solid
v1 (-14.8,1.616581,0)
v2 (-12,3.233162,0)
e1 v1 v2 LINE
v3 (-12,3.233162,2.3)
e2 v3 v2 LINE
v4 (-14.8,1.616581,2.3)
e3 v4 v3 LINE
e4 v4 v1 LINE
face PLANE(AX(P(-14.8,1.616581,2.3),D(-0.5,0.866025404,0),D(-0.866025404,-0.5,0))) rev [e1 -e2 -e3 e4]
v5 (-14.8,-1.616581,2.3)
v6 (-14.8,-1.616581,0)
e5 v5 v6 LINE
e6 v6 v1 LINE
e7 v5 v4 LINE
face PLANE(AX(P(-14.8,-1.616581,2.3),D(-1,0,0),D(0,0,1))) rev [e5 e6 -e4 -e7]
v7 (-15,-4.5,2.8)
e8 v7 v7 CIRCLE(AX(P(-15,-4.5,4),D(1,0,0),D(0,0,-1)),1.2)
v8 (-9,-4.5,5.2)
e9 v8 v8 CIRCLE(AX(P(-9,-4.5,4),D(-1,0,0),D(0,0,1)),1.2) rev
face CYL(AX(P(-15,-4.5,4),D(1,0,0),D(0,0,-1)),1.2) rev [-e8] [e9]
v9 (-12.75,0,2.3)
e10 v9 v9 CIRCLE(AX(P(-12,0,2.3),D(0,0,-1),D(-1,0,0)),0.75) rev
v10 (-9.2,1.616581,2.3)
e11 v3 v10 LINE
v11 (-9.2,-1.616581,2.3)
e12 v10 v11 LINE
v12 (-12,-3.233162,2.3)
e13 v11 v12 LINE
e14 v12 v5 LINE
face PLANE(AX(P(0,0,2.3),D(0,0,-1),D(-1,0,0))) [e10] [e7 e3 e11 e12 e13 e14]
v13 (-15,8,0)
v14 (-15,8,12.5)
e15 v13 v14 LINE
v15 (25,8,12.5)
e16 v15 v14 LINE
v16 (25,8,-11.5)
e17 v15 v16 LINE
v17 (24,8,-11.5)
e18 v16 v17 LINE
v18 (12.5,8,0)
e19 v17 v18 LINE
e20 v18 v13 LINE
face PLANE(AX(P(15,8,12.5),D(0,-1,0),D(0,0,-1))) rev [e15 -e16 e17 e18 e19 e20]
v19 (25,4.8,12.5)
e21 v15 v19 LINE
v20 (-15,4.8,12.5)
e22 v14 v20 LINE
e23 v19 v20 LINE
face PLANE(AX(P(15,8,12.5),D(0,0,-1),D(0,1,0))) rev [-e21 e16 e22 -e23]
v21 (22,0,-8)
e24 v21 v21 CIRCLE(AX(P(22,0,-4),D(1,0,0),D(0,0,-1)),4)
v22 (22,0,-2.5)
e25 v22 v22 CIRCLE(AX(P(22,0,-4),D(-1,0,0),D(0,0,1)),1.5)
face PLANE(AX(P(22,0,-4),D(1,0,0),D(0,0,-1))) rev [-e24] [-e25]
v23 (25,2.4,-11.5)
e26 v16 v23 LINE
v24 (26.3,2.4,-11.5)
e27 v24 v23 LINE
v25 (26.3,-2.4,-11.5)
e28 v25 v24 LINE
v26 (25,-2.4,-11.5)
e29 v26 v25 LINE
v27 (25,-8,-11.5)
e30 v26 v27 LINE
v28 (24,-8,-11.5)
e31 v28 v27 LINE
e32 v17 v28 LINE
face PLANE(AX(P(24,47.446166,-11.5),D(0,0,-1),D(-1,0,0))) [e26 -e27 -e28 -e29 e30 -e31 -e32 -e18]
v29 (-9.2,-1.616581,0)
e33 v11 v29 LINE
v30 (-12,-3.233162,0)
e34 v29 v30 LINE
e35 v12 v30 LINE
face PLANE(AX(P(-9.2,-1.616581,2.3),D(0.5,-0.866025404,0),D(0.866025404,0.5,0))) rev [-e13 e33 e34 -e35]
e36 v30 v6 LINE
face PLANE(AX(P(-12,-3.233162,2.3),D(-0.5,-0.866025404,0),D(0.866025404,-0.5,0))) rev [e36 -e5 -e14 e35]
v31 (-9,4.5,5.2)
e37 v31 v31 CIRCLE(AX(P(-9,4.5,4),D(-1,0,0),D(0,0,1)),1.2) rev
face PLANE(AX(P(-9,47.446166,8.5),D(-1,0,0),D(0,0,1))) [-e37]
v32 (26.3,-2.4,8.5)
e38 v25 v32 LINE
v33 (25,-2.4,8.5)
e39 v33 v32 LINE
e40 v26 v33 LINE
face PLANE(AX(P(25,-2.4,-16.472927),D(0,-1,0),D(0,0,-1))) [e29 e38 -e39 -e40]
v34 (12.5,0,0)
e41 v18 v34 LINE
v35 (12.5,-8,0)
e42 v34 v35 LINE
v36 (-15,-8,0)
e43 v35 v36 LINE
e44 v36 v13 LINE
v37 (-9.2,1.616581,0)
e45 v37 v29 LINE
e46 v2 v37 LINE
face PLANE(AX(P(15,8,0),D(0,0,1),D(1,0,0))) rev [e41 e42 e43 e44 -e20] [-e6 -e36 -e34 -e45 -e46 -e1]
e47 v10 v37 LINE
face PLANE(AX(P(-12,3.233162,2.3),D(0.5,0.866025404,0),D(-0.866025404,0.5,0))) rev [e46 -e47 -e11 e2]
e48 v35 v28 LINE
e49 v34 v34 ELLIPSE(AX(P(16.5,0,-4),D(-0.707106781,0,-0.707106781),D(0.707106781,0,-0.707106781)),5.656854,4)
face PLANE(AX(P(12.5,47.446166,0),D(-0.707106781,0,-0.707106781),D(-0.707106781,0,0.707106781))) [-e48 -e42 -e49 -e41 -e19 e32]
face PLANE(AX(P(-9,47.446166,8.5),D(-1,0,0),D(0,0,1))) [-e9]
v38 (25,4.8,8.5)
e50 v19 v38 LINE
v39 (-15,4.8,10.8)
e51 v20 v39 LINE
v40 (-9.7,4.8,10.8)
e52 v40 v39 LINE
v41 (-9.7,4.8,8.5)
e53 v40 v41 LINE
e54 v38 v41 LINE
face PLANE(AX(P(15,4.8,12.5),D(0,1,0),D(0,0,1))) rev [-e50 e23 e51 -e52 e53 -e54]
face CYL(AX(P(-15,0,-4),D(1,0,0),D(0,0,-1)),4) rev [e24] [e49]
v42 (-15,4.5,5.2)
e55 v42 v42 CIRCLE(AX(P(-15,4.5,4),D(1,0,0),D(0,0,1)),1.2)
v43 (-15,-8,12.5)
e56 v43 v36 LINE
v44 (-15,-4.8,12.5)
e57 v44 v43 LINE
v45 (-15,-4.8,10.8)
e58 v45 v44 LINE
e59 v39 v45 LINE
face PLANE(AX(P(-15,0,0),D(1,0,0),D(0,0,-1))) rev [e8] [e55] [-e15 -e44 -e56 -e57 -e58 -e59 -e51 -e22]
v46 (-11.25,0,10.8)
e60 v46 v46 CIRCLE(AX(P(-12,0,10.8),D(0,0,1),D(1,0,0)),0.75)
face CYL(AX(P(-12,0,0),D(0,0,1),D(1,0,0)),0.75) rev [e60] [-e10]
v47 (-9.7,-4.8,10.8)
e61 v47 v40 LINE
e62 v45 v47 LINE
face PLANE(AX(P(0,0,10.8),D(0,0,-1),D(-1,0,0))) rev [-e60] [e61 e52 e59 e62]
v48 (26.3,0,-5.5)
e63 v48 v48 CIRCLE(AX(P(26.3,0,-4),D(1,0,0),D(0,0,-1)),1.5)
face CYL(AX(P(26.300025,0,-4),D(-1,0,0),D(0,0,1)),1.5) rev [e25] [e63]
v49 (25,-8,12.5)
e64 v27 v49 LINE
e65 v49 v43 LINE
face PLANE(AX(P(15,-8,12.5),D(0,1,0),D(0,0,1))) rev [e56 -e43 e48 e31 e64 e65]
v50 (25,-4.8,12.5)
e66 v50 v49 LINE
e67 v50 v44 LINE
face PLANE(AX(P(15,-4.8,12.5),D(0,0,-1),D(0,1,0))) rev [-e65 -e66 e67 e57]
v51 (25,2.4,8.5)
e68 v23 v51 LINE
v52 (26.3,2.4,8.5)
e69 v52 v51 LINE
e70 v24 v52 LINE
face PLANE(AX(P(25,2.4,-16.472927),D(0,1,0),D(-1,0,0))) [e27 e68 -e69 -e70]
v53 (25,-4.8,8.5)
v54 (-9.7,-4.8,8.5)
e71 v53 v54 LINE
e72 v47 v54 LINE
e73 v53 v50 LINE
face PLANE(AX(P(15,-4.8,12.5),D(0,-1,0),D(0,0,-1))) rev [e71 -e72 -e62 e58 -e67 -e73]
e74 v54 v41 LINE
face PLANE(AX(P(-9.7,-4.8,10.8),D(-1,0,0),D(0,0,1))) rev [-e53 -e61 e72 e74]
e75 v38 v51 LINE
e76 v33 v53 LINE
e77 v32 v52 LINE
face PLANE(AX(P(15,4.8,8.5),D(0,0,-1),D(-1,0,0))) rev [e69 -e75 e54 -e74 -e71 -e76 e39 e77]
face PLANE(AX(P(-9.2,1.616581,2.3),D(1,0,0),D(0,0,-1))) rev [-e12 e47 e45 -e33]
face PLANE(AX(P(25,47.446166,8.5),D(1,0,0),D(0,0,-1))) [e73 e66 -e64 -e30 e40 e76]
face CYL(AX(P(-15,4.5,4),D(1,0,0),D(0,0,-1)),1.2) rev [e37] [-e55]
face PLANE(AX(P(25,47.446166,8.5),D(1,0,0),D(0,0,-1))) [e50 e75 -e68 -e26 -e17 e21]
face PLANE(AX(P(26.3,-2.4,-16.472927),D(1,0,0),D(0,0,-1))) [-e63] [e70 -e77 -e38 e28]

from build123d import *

# Parameters (mm, degrees)
BOSS_EXTRU_1_DEPTH                             = 15
ESQUISSE2_R                                    = 1.2
ENL_V_MAT_EXTRU_1_DEPTH                        = 26.243811123
ESQUISSE3_R                                    = 0.75
ENL_V_MAT_EXTRU_2_DEPTH                        = 20.006577809
ESQUISSE4_R                                    = 1.2
ENL_V_MAT_EXTRU_3_DEPTH                        = 34.470135942
BOSS_EXTRU_2_START                             = 2.3
ESQUISSE5_W                                    = 5.3
ESQUISSE5_H                                    = 9.6
ESQUISSE5_R                                    = 0.75
BOSS_EXTRU_2_DEPTH                             = 2.3
FRAISAGE_POUR_VIS_T_TE_FRAIS_E_M31_D           = 3.2
FRAISAGE_POUR_VIS_T_TE_FRAIS_E_M31_CSINK_D     = 6.3
FRAISAGE_POUR_VIS_T_TE_FRAIS_E_M31_CSINK_ANGLE = 90
ENL_V_MAT_EXTRU_4_DEPTH                        = 2.3
ESQUISSE9_R                                    = 1.2
ENL_V_MAT_EXTRU_5_DEPTH                        = 20.006577853
BOSS_EXTRU_3_DEPTH                             = 16
ESQUISSE11_W                                   = 4
ESQUISSE11_H                                   = 3.2
BOSS_EXTRU_4_DEPTH                             = 10
ESQUISSE14_W                                   = 1.3
ESQUISSE14_H                                   = 4.8
BOSS_EXTRU_5_DEPTH                             = 20
ENL_V_MAT_EXTRU_6_OUTLINE_W                    = 4
ENL_V_MAT_EXTRU_6_OUTLINE_H                    = 9.502069599
ESQUISSE13_R                                   = 1.5
ENL_V_MAT_EXTRU_7_DEPTH                        = 40.865398531


with BuildPart() as part:
    # Esquisse1 → Boss.-Extru.1 (new, symmetric)
    with BuildSketch(Plane(origin=(0, 0, 0), x_dir=(0, 0, -1), z_dir=(1, 0, 0))):
        Polygon((-12.5, -4.8), (-12.5, -8), (0, -8), (0, 8), (-12.5, 8), (-12.5, 4.8), (-8.5, 4.8), (-8.5, -4.8), align=None)
    extrude(amount=BOSS_EXTRU_1_DEPTH, both=True)

    # Esquisse2 → Enlèv. mat.-Extru.1 (cut, through all)
    with BuildSketch(Plane(origin=(0, 8, 0), x_dir=(1, 0, 0), z_dir=(0, 1, 0))):
        with Locations(Location((-7.5, -4, 0), (0, 0, 270))):
            Circle(ESQUISSE2_R)
        with Locations(Location((7.5, -4, 0), (0, 0, 90))):
            Circle(ESQUISSE2_R)
        with Locations(Location((0, -4, 0), (0, 0, 270))):
            Circle(ESQUISSE2_R)
    extrude(amount=-ENL_V_MAT_EXTRU_1_DEPTH, mode=Mode.SUBTRACT)

    # Esquisse3 → Enlèv. mat.-Extru.2 (cut, through all)
    with BuildSketch(Plane.XY.offset(8.5)):
        with Locations((-12, 0)):
            Circle(ESQUISSE3_R)
    extrude(amount=-ENL_V_MAT_EXTRU_2_DEPTH, mode=Mode.SUBTRACT)

    # Esquisse4 → Enlèv. mat.-Extru.3 (cut, through all)
    with BuildSketch(Plane(origin=(15, 0, 0), x_dir=(0, 0, -1), z_dir=(1, 0, 0))):
        with Locations((-4, -4.5)):
            Circle(ESQUISSE4_R)
        with Locations(Location((-4, 4.5, 0), (0, 0, 180))):
            Circle(ESQUISSE4_R)
    extrude(amount=-ENL_V_MAT_EXTRU_3_DEPTH, mode=Mode.SUBTRACT)

    # Esquisse5 → Boss.-Extru.2 (add)
    with BuildSketch(Plane.XY.offset(8.5).offset(BOSS_EXTRU_2_START)):
        with Locations((-12.35, 0)):
            Rectangle(ESQUISSE5_W, ESQUISSE5_H)
        with Locations((-12, 0)):
            Circle(ESQUISSE5_R, mode=Mode.SUBTRACT)
    extrude(amount=-BOSS_EXTRU_2_DEPTH)

    # Fraisage pour vis à tête fraisée M31 (through all)
    with Locations(Plane.XY.offset(8.5)):
        with Locations((0, 0)):
            CounterSinkHole(FRAISAGE_POUR_VIS_T_TE_FRAIS_E_M31_D / 2, FRAISAGE_POUR_VIS_T_TE_FRAIS_E_M31_CSINK_D / 2, counter_sink_angle=FRAISAGE_POUR_VIS_T_TE_FRAIS_E_M31_CSINK_ANGLE)

    # Esquisse8 → Enlèv. mat.-Extru.4 (cut)
    with BuildSketch(Plane(origin=(0, 0, 0), x_dir=(-1, 0, 0), z_dir=(0, 0, -1))):
        Polygon((14.8, 1.616580754), (12, 3.233161507), (9.2, 1.616580754), (9.2, -1.616580754), (12, -3.233161507), (14.8, -1.616580754), align=None)
    extrude(amount=-ENL_V_MAT_EXTRU_4_DEPTH, mode=Mode.SUBTRACT)

    # Esquisse9 → Enlèv. mat.-Extru.5 (cut, through all)
    with BuildSketch(Plane.XY.offset(8.5)):
        with Locations((5, 0)):
            Circle(ESQUISSE9_R)
    extrude(amount=-ENL_V_MAT_EXTRU_5_DEPTH, mode=Mode.SUBTRACT)

    # Esquisse10 → Boss.-Extru.3 (add)
    with BuildSketch(Plane.XZ.offset(8)):
        Polygon((25, 8.5), (-9, 8.5), (-9, 0), (12.5, 0), (24, -11.5), (25, -11.5), align=None)
    extrude(amount=-BOSS_EXTRU_3_DEPTH)

    # Esquisse11 → Boss.-Extru.4 (add)
    with BuildSketch(Plane(origin=(15, 0, 0), x_dir=(0, 0, -1), z_dir=(1, 0, 0))):
        with Locations((-10.5, -6.4)):
            Rectangle(ESQUISSE11_W, ESQUISSE11_H)
        with Locations((-10.5, 6.4)):
            Rectangle(ESQUISSE11_W, ESQUISSE11_H)
    extrude(amount=BOSS_EXTRU_4_DEPTH)

    # Esquisse14 → Boss.-Extru.5 (add)
    with BuildSketch(Plane.XY.offset(8.5)):
        with Locations((25.65, 0)):
            Rectangle(ESQUISSE14_W, ESQUISSE14_H)
    extrude(amount=-BOSS_EXTRU_5_DEPTH)

    # Enlèv. mat.-Extru.6: read off the stored shape, not the designer's step
    # Enlèv. mat.-Extru.6 outline → Enlèv. mat.-Extru.6 (revolve, cut)
    with BuildSketch(Plane.YX.offset(4)):
        with Locations((2, 17.248965201)):
            Rectangle(ENL_V_MAT_EXTRU_6_OUTLINE_W, ENL_V_MAT_EXTRU_6_OUTLINE_H)
    revolve(axis=Axis((0, 0, -4), (1, 0, 0)), mode=Mode.SUBTRACT)

    # Esquisse13 → Enlèv. mat.-Extru.7 (cut, through all)
    with BuildSketch(Plane.ZY.offset(-22)):
        with Locations((-4, 0)):
            Circle(ESQUISSE13_R)
    extrude(amount=-ENL_V_MAT_EXTRU_7_DEPTH, mode=Mode.SUBTRACT)


solid = part.part
